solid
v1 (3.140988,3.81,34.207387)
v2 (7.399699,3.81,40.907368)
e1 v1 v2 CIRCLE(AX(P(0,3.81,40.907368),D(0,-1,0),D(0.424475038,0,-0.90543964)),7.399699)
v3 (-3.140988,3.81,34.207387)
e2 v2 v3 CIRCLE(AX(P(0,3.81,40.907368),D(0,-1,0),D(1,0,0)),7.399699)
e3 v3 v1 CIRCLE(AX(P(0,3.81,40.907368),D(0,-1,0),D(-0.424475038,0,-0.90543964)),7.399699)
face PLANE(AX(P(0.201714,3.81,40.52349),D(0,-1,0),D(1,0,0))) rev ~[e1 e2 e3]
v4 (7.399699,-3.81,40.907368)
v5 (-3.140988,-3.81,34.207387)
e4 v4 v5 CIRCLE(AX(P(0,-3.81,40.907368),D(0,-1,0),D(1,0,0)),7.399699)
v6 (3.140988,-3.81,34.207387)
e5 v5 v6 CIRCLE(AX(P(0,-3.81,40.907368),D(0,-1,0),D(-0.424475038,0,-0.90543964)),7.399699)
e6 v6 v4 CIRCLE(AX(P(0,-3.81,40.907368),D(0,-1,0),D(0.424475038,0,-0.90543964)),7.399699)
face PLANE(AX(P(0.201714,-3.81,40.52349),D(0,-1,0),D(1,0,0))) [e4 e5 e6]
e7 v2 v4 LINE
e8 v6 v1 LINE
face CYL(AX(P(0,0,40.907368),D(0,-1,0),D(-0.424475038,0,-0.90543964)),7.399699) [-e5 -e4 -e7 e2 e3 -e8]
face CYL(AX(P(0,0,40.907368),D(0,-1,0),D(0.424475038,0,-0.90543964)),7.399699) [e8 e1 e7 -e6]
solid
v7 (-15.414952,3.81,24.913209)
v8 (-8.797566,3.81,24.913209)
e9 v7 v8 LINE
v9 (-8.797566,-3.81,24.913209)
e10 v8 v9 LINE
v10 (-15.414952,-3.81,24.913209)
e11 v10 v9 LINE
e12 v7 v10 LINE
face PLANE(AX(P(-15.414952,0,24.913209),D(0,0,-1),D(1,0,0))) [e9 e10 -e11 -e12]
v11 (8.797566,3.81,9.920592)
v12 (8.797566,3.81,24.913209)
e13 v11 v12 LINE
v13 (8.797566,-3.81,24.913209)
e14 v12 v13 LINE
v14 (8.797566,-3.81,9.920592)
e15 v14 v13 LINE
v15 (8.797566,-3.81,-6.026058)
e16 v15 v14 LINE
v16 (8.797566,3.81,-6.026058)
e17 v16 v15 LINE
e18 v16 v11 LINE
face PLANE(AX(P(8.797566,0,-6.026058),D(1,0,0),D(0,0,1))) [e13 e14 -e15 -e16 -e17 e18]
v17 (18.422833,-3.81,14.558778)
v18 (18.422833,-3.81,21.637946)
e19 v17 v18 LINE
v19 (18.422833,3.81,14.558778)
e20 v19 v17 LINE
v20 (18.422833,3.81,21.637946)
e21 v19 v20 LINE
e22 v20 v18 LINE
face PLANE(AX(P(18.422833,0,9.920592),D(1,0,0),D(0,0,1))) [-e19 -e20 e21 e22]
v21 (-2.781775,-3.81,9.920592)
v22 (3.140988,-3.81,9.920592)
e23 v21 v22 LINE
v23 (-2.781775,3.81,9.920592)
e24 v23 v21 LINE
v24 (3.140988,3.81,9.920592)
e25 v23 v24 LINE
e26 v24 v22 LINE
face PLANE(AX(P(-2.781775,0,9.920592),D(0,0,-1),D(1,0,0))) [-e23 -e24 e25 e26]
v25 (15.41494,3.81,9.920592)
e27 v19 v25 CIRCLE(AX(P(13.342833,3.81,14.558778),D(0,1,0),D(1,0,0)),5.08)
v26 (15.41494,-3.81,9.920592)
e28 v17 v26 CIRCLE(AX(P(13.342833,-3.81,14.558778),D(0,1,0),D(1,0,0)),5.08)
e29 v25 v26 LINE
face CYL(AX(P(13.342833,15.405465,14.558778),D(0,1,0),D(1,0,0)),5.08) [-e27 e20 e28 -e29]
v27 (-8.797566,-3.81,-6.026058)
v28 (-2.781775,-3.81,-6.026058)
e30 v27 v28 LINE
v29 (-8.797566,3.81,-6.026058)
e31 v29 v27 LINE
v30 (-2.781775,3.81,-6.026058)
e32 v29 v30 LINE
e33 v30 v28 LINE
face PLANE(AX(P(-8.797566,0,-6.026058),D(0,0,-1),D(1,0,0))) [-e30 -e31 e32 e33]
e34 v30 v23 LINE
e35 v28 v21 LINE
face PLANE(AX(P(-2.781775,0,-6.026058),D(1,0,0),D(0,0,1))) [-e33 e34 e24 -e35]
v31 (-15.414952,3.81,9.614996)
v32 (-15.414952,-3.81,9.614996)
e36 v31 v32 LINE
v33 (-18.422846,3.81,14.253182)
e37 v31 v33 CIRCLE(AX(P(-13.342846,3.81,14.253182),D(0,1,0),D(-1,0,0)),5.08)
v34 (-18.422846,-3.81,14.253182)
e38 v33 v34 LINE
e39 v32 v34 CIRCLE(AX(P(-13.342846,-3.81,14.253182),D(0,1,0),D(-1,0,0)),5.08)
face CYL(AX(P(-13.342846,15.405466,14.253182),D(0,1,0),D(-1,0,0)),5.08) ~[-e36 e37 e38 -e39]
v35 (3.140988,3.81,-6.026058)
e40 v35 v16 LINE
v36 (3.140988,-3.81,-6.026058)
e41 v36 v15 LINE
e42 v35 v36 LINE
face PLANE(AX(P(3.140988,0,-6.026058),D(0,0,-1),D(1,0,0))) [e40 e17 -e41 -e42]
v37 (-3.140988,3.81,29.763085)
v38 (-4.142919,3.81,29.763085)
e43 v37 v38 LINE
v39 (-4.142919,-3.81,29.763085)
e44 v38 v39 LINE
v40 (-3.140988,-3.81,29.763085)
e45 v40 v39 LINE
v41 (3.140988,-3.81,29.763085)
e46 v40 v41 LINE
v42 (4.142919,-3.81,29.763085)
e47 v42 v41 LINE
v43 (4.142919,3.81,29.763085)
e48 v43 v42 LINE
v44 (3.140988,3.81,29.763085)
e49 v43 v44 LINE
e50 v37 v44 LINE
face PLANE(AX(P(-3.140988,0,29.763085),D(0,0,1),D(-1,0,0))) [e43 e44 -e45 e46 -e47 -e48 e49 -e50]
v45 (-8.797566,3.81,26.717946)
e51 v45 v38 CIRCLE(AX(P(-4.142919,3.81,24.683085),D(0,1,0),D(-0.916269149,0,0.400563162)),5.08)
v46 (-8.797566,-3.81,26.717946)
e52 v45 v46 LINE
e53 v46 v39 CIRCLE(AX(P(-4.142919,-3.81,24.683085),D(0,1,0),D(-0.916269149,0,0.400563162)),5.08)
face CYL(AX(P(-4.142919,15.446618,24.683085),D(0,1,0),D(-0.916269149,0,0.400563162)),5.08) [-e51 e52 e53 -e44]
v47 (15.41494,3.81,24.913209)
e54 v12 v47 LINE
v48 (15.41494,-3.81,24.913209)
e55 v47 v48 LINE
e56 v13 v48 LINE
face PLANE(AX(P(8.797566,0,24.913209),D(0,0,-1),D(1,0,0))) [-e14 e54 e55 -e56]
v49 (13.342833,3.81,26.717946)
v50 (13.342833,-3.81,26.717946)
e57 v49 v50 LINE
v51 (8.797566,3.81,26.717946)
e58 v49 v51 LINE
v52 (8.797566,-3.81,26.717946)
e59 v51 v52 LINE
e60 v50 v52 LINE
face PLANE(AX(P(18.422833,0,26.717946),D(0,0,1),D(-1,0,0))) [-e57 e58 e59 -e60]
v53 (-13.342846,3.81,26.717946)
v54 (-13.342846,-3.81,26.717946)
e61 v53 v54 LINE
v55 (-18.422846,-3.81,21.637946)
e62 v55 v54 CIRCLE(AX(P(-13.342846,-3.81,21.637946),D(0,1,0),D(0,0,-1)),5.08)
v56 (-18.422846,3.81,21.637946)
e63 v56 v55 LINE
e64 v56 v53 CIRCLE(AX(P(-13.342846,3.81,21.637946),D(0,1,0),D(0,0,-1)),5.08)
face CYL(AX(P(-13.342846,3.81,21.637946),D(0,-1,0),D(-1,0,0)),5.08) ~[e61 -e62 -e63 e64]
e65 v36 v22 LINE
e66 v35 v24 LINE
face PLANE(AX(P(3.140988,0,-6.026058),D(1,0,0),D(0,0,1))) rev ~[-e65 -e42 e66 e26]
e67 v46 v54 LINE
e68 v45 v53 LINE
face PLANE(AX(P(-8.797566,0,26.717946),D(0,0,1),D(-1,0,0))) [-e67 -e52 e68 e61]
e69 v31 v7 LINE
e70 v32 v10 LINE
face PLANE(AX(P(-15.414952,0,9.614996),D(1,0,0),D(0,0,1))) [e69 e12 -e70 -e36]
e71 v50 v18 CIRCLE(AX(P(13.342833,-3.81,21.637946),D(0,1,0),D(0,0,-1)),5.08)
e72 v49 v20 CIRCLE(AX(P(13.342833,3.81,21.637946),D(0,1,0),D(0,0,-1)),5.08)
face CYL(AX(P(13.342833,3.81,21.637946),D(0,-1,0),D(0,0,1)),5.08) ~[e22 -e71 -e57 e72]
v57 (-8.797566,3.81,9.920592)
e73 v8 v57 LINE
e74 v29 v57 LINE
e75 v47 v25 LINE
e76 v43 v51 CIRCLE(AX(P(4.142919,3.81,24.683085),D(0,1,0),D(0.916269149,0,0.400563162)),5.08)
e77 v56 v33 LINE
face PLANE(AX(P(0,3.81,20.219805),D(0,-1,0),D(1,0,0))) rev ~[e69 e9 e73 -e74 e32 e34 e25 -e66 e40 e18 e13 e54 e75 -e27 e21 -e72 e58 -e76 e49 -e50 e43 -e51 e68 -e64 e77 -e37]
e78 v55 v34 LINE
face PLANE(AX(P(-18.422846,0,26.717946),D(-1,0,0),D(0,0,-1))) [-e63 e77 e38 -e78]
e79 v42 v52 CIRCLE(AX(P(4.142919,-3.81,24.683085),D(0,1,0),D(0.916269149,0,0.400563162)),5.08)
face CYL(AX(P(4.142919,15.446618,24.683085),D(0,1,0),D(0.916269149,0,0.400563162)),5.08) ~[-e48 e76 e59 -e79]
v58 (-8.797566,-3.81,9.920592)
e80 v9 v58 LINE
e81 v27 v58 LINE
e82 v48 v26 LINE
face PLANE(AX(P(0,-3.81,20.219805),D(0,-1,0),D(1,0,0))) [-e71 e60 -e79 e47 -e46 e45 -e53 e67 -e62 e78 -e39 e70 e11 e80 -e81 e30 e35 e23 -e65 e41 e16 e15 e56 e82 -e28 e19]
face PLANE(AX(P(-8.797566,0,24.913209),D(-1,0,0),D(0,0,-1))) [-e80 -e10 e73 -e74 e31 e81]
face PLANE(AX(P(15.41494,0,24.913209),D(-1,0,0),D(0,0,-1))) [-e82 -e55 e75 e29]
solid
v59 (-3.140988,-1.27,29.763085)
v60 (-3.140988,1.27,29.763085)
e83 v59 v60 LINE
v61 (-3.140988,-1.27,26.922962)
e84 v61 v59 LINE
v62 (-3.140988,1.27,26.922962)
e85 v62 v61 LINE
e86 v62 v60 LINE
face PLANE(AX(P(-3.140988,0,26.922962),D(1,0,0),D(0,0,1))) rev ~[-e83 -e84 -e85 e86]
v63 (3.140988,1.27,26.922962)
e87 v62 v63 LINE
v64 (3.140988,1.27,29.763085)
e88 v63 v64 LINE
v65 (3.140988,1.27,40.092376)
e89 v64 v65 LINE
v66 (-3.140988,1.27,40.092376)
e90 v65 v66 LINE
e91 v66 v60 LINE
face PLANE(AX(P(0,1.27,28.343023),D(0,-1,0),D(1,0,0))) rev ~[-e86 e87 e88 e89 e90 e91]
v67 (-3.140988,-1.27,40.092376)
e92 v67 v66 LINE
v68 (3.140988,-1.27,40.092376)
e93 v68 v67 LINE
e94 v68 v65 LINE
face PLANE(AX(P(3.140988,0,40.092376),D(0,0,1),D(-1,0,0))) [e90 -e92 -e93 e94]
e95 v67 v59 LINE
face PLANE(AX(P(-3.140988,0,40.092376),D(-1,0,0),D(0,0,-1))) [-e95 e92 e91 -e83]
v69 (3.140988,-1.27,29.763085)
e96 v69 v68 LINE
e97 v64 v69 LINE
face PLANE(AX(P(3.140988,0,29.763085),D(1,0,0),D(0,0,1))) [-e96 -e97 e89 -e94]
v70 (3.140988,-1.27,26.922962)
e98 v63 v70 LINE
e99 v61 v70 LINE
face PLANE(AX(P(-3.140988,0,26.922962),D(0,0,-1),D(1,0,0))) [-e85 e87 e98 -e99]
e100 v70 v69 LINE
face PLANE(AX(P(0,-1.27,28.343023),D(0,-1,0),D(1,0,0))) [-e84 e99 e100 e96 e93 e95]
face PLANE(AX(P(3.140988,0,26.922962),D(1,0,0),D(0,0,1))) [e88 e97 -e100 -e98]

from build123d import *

# Parameters (mm, degrees)
F0_W        = 6.0157910921
F0_H        = 15.9466497103
F0_W_2      = 6.6173858
F0_H_2      = 1.8047373742
F0_W_3      = 6.6173737869
F0_W_4      = 5.6565788109
F0_W_5      = 6.2819751911
F0_H_3      = 2.8401233753
F1_DEPTH    = 3.81
F2_DEPTH    = 1.27
F3_R        = 5.08
F4_T1_DEPTH = 30.8109306563
F4_T3_DEPTH = 30.8109326237
F5_T1_DEPTH = 30.8932363866


# Not quite as in the source:
# - a fillet or chamfer that OpenCascade refuses, or shapes differently, is made with other operations: its cross-section is extruded or revolved along the edge and cut away or added


with BuildPart() as f1:
    # F0 (on Front) → F1 (new body, symmetric)
    with BuildSketch(Plane.XZ):
        Polygon((-3.1409875955, 26.922961697), (-3.1409875955, 29.7630850723), (-8.7975664064, 29.7630850723), (-8.7975664064, 26.7179459333), (-8.7975664064, 24.9132085592), (-8.7975664064, 9.9205921838), (-2.7817753144, 9.9205921838), (3.1409875955, 9.9205921838), (8.7975664064, 9.9205921838), (8.7975664064, 24.9132085592), (8.7975664064, 26.7179459333), (8.7975664064, 29.7630850723), (3.1409875955, 29.7630850723), (3.1409875955, 26.922961697), align=None)
        with Locations((-5.7896708604, 1.9472673287)):
            Rectangle(F0_W, F0_H)
        Polygon((-15.4149522064, 24.9132085592), (-15.4149522064, 26.7179459333), (-18.4228456064, 26.7179459333), (-18.4228456064, 9.6149956807), (-15.4149522064, 9.6149956807), align=None)
        with Locations((-12.1062593064, 25.8155772462)):
            Rectangle(F0_W_2, F0_H_2)
        Polygon((18.4228327125, 26.7179459333), (15.4149401933, 26.7179459333), (15.4149401933, 24.9132085592), (15.4149401933, 9.9205921838), (18.4228327125, 9.9205921838), align=None)
        with Locations((12.1062532999, 25.8155772462)):
            Rectangle(F0_W_3, F0_H_2)
        with Locations((5.969277001, 1.9472673287)):
            Rectangle(F0_W_4, F0_H)
        with Locations((0, 28.3430233846)):
            Rectangle(F0_W_5, F0_H_3)
    extrude(amount=F1_DEPTH, both=True)

    # F3
    f3_edges = [f1.edges().sort_by_distance(p)[0] for p in [
        (-18.422846, 0, 26.717946),
        (18.422833, 0, 26.717946),
    ]]
    fillet(f3_edges, radius=F3_R)

    # F4: fillet of radius 5.08 on 2 edges, made by hand

    # F4_s2 → F4_t1 (cut)
    with BuildSketch(Plane.XZ.offset(-15.4054653281)):
        with BuildLine():
            ThreePointArc((18.4228327125, 14.558778315), (17.6050332007, 11.794714821), (15.4149401933, 9.9205921838))
            Line((15.4149401933, 9.9205921838), (18.4228327125, 9.9205921838))
            Line((18.4228327125, 9.9205921838), (18.4228327125, 14.558778315))
        make_face()
    extrude(amount=F4_T1_DEPTH, mode=Mode.SUBTRACT)

    # F4_s4 → F4_t3 (cut)
    with BuildSketch(Plane.XZ.offset(-15.4054663118)):
        with BuildLine():
            ThreePointArc((-18.4228456064, 14.2531822055), (-17.6050458321, 11.4891183068), (-15.4149522064, 9.6149956807))
            Line((-15.4149522064, 9.6149956807), (-18.4228456064, 9.6149956807))
            Line((-18.4228456064, 9.6149956807), (-18.4228456064, 14.2531822055))
        make_face()
    extrude(amount=F4_T3_DEPTH, mode=Mode.SUBTRACT)

    # F5: fillet of radius 5.08 on 2 edges, made by hand

    # F5_s2 → F5_t1 (cut)
    with BuildSketch(Plane.XZ.offset(-15.4466181933)):
        with BuildLine():
            ThreePointArc((8.7975664064, 26.7179459333), (6.9240436163, 28.9341727669), (4.1429191291, 29.7630850723))
            Line((4.1429191291, 29.7630850723), (8.7975664064, 29.7630850723))
            Line((8.7975664064, 29.7630850723), (8.7975664064, 26.7179459333))
        make_face()
        with BuildLine():
            ThreePointArc((-8.7975664064, 26.7179459333), (-6.9240436163, 28.9341727669), (-4.1429191291, 29.7630850723))
            Line((-4.1429191291, 29.7630850723), (-8.7975664064, 29.7630850723))
            Line((-8.7975664064, 29.7630850723), (-8.7975664064, 26.7179459333))
        make_face()
    extrude(amount=F5_T1_DEPTH, mode=Mode.SUBTRACT)


with BuildPart() as f1b:
    # F0 (on Front) → F1, piece 2 (new body, symmetric)
    with BuildSketch(Plane.XZ):
        with BuildLine():
            ThreePointArc((3.1409875955, 34.2073870963), (6.2449143868, 36.9379106269), (7.3996991859, 40.9073680639))
            ThreePointArc((7.3996991859, 40.9073680639), (-3.969457437, 47.1522824507), (-3.1409875955, 34.2073870963))
            Line((-3.1409875955, 34.2073870963), (-3.1409875955, 40.092376059))
            Line((-3.1409875955, 40.092376059), (3.1409875955, 40.092376059))
            Line((3.1409875955, 40.092376059), (3.1409875955, 34.2073870963))
        make_face()
        with BuildLine():
            Line((-3.1409875955, 40.092376059), (-3.1409875955, 34.2073870963))
            ThreePointArc((-3.1409875955, 34.2073870963), (0, 33.507668878), (3.1409875955, 34.2073870963))
            Line((3.1409875955, 34.2073870963), (3.1409875955, 40.092376059))
            Line((3.1409875955, 40.092376059), (-3.1409875955, 40.092376059))
        make_face()
    extrude(amount=F1_DEPTH, both=True)


with BuildPart() as f2:
    # F0 (on Front) → F2 (new body, symmetric)
    with BuildSketch(Plane.XZ):
        with Locations((0, 28.3430233846)):
            Rectangle(F0_W_5, F0_H_3)
        with BuildLine():
            ThreePointArc((3.1409875955, 34.2073870963), (0, 33.507668878), (-3.1409875955, 34.2073870963))
            Line((-3.1409875955, 34.2073870963), (-3.1409875955, 29.7630850723))
            Line((-3.1409875955, 29.7630850723), (3.1409875955, 29.7630850723))
            Line((3.1409875955, 29.7630850723), (3.1409875955, 34.2073870963))
        make_face()
        with BuildLine():
            Line((-3.1409875955, 40.092376059), (-3.1409875955, 34.2073870963))
            ThreePointArc((-3.1409875955, 34.2073870963), (0, 33.507668878), (3.1409875955, 34.2073870963))
            Line((3.1409875955, 34.2073870963), (3.1409875955, 40.092376059))
            Line((3.1409875955, 40.092376059), (-3.1409875955, 40.092376059))
        make_face()
    extrude(amount=F2_DEPTH, both=True)


solid = Compound([f1.part, f1b.part, f2.part])
